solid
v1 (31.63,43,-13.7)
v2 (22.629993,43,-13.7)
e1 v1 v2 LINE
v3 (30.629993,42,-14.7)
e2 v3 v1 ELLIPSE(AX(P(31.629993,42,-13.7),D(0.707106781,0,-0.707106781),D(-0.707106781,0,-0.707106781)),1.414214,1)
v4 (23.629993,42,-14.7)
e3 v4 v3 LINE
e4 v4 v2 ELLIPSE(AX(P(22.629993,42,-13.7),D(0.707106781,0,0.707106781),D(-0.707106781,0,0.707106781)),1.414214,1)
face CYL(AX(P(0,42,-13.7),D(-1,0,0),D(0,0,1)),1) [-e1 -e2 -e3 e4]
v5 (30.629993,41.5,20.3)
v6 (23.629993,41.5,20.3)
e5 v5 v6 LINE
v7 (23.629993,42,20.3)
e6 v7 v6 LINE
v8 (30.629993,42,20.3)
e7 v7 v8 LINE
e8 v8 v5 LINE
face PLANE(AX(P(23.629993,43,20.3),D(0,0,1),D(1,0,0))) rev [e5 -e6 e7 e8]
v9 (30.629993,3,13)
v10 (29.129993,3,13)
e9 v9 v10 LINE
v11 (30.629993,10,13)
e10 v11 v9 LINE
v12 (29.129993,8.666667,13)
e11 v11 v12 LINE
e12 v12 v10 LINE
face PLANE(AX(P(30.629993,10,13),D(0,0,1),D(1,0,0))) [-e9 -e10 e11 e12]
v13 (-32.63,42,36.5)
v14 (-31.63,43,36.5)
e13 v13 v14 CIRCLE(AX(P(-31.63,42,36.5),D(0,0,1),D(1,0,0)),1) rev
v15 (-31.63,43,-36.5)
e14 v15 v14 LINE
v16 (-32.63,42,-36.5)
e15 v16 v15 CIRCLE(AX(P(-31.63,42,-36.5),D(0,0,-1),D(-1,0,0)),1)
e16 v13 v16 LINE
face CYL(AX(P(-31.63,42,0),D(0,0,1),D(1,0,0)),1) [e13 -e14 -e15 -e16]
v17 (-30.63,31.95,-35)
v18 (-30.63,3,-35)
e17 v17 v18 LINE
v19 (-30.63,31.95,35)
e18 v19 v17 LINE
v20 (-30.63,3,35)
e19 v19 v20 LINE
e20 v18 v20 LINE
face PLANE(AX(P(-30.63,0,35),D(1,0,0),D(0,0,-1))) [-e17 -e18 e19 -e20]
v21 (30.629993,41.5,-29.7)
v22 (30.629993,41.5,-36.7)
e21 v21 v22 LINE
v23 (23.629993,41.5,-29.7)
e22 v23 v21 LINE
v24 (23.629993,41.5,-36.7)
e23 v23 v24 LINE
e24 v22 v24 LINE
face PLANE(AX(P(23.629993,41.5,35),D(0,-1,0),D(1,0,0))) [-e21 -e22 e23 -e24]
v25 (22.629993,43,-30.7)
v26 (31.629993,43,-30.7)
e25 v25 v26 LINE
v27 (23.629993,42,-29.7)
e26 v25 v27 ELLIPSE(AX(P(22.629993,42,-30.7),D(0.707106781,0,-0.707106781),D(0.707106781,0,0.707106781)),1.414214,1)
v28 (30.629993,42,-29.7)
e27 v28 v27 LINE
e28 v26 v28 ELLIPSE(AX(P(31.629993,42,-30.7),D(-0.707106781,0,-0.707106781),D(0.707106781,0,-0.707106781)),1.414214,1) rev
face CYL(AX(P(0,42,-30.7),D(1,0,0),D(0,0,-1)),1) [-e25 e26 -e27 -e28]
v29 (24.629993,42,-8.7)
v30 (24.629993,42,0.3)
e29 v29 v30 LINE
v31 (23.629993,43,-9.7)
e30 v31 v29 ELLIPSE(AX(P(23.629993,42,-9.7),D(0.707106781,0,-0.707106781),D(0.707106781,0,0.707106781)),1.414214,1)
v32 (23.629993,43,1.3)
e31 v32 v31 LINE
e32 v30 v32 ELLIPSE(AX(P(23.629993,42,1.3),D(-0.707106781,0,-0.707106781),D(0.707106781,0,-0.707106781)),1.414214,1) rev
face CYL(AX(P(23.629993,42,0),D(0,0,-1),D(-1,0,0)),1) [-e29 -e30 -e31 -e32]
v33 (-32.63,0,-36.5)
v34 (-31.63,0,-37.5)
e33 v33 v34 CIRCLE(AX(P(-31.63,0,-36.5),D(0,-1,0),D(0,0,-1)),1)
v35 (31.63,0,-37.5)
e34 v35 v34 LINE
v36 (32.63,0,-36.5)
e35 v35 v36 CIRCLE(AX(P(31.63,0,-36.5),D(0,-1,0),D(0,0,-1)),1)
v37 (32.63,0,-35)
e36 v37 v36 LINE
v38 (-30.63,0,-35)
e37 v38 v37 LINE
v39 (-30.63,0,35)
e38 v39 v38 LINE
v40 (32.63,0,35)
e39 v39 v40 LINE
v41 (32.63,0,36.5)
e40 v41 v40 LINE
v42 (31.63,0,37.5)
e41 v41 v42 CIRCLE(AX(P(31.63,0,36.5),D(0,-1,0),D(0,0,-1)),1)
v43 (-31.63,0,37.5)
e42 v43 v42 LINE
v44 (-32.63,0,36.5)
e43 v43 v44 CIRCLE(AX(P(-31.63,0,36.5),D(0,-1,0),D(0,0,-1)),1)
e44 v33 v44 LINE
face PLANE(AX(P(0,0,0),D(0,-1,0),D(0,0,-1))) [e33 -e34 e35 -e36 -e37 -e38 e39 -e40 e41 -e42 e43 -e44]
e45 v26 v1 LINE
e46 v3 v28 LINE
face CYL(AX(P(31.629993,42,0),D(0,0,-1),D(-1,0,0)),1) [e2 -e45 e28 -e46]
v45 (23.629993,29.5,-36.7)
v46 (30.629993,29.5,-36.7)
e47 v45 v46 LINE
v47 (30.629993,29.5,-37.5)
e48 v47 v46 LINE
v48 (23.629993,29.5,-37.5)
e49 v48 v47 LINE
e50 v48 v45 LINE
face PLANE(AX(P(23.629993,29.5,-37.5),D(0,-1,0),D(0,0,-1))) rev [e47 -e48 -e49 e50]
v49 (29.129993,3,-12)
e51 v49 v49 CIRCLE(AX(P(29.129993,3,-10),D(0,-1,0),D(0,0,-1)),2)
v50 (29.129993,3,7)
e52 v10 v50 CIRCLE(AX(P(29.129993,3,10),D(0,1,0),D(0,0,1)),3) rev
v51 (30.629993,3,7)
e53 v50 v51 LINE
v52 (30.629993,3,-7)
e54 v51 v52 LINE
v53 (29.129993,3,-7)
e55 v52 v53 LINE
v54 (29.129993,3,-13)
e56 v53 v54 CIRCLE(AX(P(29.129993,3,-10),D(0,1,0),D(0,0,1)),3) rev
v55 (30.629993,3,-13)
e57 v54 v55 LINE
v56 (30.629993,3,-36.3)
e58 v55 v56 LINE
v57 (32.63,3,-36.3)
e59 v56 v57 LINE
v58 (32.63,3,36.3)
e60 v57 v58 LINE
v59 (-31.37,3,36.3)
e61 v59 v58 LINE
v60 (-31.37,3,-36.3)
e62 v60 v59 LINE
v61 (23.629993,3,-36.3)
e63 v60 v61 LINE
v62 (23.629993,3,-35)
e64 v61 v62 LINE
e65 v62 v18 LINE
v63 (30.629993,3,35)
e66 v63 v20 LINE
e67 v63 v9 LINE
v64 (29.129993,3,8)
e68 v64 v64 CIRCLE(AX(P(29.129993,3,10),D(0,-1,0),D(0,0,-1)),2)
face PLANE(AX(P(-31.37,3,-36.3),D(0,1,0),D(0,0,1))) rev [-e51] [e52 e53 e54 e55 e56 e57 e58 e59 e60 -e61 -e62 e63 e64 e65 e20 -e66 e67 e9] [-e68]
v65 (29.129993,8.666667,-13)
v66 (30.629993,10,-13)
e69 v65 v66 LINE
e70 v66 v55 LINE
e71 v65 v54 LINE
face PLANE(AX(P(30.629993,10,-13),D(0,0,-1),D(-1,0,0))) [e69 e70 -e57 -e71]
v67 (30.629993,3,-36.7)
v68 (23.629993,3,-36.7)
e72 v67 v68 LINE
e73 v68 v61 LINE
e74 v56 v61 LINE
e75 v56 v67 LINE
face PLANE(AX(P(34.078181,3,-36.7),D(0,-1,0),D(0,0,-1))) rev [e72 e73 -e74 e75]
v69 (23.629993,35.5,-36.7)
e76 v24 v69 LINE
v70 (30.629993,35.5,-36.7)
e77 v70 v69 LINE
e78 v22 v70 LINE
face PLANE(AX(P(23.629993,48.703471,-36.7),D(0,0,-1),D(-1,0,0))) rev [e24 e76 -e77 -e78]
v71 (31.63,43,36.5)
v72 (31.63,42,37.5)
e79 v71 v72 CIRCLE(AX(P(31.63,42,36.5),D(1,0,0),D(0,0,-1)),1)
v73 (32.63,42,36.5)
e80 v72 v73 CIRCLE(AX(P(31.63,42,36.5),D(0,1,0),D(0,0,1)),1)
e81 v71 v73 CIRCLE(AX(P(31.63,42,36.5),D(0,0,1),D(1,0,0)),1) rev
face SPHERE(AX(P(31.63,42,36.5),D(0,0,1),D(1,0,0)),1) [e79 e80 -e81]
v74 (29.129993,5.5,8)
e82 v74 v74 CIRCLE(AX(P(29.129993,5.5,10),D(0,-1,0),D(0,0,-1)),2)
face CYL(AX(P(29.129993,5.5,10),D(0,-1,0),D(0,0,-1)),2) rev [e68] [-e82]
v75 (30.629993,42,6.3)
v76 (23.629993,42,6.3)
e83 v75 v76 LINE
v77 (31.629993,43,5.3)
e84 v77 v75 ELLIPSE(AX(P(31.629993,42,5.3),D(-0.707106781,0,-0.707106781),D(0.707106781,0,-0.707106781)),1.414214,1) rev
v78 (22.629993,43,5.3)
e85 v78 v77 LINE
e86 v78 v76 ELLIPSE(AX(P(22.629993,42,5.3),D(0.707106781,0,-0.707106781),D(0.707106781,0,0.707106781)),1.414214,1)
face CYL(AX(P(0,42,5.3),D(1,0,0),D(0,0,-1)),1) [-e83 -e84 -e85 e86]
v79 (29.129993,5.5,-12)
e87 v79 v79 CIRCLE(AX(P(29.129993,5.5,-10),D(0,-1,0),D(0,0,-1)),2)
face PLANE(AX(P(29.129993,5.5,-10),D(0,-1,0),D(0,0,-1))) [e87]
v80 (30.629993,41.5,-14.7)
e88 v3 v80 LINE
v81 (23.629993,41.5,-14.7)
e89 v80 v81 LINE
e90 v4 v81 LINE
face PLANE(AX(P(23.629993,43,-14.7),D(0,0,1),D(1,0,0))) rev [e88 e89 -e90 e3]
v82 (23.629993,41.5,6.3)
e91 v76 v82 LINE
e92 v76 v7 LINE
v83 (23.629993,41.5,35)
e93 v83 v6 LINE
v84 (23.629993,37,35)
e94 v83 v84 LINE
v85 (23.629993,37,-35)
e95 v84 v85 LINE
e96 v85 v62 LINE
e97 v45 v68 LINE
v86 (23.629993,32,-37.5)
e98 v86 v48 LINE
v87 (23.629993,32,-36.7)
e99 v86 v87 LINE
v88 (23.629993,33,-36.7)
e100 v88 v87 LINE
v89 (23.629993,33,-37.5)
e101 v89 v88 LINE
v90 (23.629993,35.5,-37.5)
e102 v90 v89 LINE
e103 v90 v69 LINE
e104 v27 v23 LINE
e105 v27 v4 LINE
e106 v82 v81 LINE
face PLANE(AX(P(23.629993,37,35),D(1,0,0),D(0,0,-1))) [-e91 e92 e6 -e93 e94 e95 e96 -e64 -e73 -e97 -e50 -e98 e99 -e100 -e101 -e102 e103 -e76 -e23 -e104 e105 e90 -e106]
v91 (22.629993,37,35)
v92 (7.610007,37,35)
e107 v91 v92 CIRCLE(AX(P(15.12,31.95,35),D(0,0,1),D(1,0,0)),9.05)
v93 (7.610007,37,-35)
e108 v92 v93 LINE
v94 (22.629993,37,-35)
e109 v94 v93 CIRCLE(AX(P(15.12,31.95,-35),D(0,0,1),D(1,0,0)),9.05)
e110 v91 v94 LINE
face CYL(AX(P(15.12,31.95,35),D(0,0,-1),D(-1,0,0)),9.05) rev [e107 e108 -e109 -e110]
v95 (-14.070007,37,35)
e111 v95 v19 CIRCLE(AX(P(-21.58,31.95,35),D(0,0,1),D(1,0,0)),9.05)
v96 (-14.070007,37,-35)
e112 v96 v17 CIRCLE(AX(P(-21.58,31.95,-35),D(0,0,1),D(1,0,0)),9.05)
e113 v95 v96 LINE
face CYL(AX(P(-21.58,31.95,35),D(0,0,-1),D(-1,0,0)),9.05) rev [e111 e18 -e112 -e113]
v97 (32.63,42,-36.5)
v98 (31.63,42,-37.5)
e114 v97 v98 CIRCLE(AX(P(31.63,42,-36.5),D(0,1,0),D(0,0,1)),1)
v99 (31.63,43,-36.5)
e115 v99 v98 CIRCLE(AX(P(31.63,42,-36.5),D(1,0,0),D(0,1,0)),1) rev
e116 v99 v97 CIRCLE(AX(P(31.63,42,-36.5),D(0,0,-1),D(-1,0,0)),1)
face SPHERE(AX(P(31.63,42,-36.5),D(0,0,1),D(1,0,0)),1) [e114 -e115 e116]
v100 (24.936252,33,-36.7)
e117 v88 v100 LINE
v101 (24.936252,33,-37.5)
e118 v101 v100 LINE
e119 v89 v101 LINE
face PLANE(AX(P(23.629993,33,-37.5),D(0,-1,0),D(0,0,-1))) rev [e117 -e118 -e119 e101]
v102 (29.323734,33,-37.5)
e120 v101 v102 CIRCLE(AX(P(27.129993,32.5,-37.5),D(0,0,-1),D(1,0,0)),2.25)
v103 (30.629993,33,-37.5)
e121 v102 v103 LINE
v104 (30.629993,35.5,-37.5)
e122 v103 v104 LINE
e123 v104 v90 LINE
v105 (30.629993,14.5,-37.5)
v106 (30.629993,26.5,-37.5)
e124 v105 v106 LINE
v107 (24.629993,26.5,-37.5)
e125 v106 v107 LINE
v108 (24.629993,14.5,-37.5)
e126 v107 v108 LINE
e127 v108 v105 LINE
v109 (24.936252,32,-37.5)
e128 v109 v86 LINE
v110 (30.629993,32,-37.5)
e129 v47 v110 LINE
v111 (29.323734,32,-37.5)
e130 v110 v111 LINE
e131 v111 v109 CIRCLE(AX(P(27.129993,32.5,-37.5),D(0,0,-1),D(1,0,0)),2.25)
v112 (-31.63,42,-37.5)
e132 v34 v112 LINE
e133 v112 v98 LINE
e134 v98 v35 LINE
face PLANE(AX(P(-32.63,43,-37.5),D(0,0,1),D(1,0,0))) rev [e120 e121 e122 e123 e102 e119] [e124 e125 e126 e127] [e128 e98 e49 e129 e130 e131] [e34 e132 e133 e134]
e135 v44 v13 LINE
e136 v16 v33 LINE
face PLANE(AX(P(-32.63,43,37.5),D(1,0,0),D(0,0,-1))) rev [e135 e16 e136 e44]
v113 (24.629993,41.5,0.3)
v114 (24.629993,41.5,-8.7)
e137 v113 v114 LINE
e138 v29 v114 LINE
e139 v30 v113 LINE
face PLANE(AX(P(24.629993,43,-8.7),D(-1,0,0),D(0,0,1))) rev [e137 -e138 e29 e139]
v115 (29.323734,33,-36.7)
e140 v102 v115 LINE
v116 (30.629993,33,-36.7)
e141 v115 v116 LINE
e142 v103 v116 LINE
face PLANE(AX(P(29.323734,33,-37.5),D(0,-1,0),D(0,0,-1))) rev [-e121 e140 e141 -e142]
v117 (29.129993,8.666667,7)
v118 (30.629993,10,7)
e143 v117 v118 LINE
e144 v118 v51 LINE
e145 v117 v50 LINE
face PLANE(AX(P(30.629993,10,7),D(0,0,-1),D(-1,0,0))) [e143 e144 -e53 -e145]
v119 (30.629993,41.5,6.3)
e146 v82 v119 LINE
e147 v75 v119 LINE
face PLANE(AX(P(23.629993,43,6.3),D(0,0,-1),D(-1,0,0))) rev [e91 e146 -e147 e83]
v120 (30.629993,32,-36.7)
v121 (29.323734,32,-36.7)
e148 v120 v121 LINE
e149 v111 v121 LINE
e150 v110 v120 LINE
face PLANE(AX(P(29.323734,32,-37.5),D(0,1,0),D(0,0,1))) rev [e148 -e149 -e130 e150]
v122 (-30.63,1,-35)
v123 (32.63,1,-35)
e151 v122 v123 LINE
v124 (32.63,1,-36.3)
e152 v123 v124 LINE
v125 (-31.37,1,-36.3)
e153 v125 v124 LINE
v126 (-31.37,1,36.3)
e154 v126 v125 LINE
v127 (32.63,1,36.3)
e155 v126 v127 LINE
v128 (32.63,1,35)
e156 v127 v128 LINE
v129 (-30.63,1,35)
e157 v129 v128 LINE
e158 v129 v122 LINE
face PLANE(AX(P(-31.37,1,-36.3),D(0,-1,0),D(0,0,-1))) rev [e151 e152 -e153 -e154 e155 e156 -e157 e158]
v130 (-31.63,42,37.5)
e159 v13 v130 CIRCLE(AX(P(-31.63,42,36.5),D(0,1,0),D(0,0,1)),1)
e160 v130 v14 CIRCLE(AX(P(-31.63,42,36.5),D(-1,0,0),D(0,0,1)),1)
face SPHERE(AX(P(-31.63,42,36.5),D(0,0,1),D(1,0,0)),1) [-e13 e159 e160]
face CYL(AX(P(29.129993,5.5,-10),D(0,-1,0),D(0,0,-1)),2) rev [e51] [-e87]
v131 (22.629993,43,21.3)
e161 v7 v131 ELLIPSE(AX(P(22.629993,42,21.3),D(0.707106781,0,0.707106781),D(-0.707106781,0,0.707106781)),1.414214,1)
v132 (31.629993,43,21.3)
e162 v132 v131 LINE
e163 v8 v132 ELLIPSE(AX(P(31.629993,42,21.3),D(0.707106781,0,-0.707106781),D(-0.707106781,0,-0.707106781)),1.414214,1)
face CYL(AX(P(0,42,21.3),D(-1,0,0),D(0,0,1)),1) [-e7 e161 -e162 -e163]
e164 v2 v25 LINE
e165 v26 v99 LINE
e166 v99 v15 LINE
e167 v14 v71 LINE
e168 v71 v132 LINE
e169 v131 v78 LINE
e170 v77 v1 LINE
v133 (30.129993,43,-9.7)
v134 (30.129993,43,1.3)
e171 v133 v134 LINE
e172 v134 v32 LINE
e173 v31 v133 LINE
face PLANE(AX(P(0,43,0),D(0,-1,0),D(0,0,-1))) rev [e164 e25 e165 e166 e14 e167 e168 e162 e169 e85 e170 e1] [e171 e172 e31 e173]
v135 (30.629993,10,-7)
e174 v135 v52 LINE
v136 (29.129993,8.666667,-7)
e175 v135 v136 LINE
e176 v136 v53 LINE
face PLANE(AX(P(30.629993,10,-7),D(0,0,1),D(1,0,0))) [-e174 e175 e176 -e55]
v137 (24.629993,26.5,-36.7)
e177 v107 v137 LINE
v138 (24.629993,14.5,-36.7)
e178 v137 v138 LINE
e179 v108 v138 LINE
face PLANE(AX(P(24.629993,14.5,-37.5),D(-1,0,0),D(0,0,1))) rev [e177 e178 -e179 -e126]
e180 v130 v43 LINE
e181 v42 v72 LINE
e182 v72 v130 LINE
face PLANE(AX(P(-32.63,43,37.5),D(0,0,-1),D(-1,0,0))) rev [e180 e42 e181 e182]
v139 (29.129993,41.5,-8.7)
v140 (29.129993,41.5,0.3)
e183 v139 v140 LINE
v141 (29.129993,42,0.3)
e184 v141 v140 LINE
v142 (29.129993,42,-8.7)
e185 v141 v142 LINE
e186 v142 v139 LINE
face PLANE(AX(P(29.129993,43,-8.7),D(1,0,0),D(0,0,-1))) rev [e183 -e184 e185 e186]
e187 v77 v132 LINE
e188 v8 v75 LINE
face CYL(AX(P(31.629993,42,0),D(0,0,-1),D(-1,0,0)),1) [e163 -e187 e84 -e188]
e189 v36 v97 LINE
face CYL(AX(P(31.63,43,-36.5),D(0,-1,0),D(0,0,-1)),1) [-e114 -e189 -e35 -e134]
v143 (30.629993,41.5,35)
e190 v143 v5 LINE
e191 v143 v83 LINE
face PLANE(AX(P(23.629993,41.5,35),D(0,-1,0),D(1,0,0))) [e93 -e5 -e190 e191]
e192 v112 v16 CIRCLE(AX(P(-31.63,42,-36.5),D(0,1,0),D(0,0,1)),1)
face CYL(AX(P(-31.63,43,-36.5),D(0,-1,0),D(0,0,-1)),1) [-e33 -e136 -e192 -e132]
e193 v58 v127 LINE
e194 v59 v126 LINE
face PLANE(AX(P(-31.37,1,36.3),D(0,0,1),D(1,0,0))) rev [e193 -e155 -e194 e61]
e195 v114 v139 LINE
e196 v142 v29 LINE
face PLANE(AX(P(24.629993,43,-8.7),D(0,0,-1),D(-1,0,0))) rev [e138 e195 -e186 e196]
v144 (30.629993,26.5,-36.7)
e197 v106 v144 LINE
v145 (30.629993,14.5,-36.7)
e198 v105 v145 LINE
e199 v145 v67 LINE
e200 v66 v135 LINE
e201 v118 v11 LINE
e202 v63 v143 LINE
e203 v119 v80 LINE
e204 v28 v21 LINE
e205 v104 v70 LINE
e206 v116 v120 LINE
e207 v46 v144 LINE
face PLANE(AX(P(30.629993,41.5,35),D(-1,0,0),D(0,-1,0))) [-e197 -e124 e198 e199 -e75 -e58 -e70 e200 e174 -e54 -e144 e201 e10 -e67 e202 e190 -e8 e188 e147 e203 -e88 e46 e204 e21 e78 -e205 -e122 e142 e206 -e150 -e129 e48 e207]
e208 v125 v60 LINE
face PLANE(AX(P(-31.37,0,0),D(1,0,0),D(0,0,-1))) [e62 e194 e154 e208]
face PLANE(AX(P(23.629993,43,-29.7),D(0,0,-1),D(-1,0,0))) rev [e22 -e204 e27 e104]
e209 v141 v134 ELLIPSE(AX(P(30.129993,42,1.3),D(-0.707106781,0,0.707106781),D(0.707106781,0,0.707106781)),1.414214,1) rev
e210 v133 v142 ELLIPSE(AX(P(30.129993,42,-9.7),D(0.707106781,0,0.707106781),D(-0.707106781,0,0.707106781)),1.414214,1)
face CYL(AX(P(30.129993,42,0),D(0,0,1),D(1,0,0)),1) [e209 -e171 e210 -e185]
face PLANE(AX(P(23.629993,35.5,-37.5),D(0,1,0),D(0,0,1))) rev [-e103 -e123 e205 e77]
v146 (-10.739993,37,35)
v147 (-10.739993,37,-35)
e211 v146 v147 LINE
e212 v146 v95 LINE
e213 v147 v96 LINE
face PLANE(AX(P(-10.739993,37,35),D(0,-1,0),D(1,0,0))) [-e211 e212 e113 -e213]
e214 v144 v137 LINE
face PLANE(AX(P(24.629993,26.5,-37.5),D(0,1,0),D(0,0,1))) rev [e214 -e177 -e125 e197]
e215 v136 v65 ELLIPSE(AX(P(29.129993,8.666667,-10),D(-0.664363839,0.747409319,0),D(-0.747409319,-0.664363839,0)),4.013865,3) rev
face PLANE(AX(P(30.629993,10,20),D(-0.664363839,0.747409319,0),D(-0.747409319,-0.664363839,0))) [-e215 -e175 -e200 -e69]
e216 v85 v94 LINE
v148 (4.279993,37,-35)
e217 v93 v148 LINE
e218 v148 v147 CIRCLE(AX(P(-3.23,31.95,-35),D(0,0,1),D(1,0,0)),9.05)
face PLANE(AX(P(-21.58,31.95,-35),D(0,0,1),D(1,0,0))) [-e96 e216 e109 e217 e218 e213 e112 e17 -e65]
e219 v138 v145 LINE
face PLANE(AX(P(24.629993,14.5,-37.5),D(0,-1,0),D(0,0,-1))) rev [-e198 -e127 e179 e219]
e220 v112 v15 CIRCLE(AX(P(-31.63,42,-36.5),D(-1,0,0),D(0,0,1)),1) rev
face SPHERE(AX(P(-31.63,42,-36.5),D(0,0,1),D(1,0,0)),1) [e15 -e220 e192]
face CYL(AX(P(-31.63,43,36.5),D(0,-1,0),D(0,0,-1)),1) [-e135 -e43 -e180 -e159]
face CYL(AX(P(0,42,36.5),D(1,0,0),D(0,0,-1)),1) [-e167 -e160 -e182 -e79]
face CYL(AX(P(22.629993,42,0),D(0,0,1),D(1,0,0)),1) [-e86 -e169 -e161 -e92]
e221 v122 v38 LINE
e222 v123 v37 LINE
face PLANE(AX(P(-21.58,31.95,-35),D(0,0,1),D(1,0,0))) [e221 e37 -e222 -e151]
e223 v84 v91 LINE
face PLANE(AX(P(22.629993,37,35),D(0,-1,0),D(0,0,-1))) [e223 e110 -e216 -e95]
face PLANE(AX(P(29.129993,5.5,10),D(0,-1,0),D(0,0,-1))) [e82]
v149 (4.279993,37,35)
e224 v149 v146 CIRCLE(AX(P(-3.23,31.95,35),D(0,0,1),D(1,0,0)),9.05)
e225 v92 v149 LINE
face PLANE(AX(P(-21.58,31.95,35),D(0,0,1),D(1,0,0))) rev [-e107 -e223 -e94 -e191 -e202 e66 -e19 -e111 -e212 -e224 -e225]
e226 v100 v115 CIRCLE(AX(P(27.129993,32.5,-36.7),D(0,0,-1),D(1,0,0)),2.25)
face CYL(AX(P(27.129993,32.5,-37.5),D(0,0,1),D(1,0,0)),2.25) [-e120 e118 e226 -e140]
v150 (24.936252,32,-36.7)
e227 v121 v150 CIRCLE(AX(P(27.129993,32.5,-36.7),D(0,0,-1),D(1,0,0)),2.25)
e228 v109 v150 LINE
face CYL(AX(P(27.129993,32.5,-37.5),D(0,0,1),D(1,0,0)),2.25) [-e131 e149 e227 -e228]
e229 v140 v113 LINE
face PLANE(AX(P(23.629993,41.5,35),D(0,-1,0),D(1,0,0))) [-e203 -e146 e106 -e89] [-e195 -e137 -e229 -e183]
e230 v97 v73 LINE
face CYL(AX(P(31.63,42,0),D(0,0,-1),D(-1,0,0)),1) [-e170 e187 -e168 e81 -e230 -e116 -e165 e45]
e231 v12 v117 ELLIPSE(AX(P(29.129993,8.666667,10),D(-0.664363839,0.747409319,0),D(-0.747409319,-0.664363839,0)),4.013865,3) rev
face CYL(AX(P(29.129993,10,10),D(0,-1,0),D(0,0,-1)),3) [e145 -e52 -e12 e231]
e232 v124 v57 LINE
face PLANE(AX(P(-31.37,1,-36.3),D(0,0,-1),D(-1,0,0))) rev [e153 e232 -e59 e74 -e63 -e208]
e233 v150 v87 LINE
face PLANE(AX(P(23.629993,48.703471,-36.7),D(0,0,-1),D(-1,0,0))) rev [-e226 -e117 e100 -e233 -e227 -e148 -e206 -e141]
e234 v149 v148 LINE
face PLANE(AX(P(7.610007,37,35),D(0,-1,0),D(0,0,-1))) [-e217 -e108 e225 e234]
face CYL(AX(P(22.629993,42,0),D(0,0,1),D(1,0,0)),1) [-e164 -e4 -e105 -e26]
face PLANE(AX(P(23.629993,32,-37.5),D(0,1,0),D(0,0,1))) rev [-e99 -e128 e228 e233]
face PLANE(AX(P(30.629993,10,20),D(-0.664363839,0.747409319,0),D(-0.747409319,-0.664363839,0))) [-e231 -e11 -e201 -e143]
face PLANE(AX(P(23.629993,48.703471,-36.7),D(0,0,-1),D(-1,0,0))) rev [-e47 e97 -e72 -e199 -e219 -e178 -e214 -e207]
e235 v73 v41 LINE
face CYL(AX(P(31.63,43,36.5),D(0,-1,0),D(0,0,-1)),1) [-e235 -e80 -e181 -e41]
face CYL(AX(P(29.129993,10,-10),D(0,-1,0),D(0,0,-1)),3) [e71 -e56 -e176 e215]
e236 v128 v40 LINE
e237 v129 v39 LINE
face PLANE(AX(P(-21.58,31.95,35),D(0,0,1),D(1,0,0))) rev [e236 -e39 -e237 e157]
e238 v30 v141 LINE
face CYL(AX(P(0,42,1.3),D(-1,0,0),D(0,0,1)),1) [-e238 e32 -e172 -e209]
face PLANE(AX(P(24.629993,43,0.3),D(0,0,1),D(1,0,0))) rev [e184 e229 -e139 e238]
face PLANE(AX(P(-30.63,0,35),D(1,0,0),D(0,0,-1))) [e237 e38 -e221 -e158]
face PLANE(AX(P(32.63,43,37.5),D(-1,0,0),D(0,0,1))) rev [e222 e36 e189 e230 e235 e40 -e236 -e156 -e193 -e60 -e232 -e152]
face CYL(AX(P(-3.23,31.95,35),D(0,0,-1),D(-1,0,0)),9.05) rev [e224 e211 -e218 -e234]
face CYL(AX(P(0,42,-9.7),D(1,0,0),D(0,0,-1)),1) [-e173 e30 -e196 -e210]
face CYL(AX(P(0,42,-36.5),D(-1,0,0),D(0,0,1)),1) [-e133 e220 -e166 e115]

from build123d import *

# Parameters (mm, degrees)
SKETCH1_W               = 65.26
SKETCH1_H               = 75
BOSS_EXTRUDE1_DEPTH     = 43
CUT_EXTRUDE1_DEPTH      = 35
CUT_EXTRUDE1_DEPTH_BACK = 35
SKETCH4_W               = 7
SKETCH4_H               = 1.7
CUT_EXTRUDE2_DEPTH      = 41.5
SKETCH5_W               = 7
SKETCH5_H               = 14
SKETCH5_H_2             = 15
SKETCH5_W_2             = 4.5
SKETCH5_H_3             = 9
CUT_EXTRUDE3_DEPTH      = 65.755053085
SKETCH7_W               = 6
SKETCH7_H               = 12
CUT_EXTRUDE4_DEPTH      = 92.75705368
FILLET1_R               = 1
BOSS_EXTRUDE2_DEPTH     = 10
CUT_EXTRUDE5_DEPTH      = 20
CUT_EXTRUDE5_DEPTH_BACK = 20
SKETCH12_W              = 72.6
SKETCH12_H              = 2
CUT_EXTRUDE6_DEPTH      = 64
SKETCH13_W              = 6.500006658
SKETCH13_H              = 70
CUT_EXTRUDE7_DEPTH      = 3
BOSS_EXTRUDE3_DEPTH     = 7
SKETCH17_R              = 2
CUT_EXTRUDE9_DEPTH      = 2.5


with BuildPart() as part:
    # Sketch1 → Boss-Extrude1 (new body)
    with BuildSketch(Plane(origin=(0, 0, 0), x_dir=(1, 0, 0), z_dir=(0, 1, 0))):
        Rectangle(SKETCH1_W, SKETCH1_H)
    extrude(amount=BOSS_EXTRUDE1_DEPTH)

    # Sketch3 → Cut-Extrude1 (cut, two sides: drawn at the far end of the back side and taken through both)
    with BuildSketch(Plane.XY.offset(-CUT_EXTRUDE1_DEPTH_BACK)):
        with BuildLine():
            Line((30.629993342, 0), (-30.63, 0))
            Line((-30.63, 0), (-30.63, 31.95))
            ThreePointArc((-30.63, 31.95), (-24.219797365, 40.606440947), (-14.070006658, 37))
            Line((-14.070006658, 37), (-10.739993342, 37))
            ThreePointArc((-10.739993342, 37), (-3.23, 41), (4.279993342, 37))
            Line((4.279993342, 37), (7.610006658, 37))
            ThreePointArc((7.610006658, 37), (15.12, 41), (22.629993342, 37))
            Line((22.629993342, 37), (23.629993342, 37))
            Line((23.629993342, 37), (23.629993342, 41.5))
            Line((23.629993342, 41.5), (30.629993342, 41.5))
            Line((30.629993342, 41.5), (30.629993342, 0))
        make_face()
    extrude(amount=CUT_EXTRUDE1_DEPTH + CUT_EXTRUDE1_DEPTH_BACK, mode=Mode.SUBTRACT)

    # Sketch4 → Cut-Extrude2 (cut)
    with BuildSketch(Plane(origin=(0, 0, 0), x_dir=(-1, 0, 0), z_dir=(0, -1, 0))):
        with Locations((-27.129993342, 35.85)):
            Rectangle(SKETCH4_W, SKETCH4_H)
    extrude(amount=-CUT_EXTRUDE2_DEPTH, mode=Mode.SUBTRACT)

    # Sketch5 → Cut-Extrude3 (cut, through all)
    with BuildSketch(Plane(origin=(0, 41.5, 0), x_dir=(-1, 0, 0), z_dir=(0, -1, 0))):
        with Locations((-27.129993342, -13.3)):
            Rectangle(SKETCH5_W, SKETCH5_H)
        with Locations((-27.129993342, 22.2)):
            Rectangle(SKETCH5_W, SKETCH5_H_2)
        with Locations((-26.879993342, 4.2)):
            Rectangle(SKETCH5_W_2, SKETCH5_H_3)
    extrude(amount=-CUT_EXTRUDE3_DEPTH, mode=Mode.SUBTRACT)

    # Sketch7 → Cut-Extrude4 (cut, through all)
    with BuildSketch(Plane.XY.offset(-36.7)):
        with BuildLine():
            Line((23.629993342, 29.5), (30.629993342, 29.5))
            Line((30.629993342, 29.5), (30.629993342, 32))
            Line((30.629993342, 32), (29.323734439, 32))
            ThreePointArc((29.323734439, 32), (27.129993342, 30.25), (24.936252245, 32))
            Line((24.936252245, 32), (23.629993342, 32))
            Line((23.629993342, 32), (23.629993342, 29.5))
        make_face()
        with BuildLine():
            Line((23.629993342, 35.5), (30.629993342, 35.5))
            Line((30.629993342, 35.5), (30.629993342, 33))
            Line((30.629993342, 33), (29.323734439, 33))
            ThreePointArc((29.323734439, 33), (27.129993342, 34.75), (24.936252245, 33))
            Line((24.936252245, 33), (23.629993342, 33))
            Line((23.629993342, 33), (23.629993342, 35.5))
        make_face()
        with Locations((27.629993342, 20.5)):
            Rectangle(SKETCH7_W, SKETCH7_H)
    extrude(amount=-CUT_EXTRUDE4_DEPTH, mode=Mode.SUBTRACT)

    # Fillet1
    fillet1_edges = [part.edges().sort_by_distance(p)[0] for p in [
        (0, 43, -37.5),
        (32.63, 43, 0),
        (0, 43, 37.5),
        (-32.63, 43, 0),
        (29.129993342, 43, -4.2),
        (26.879993342, 43, -8.7),
        (24.629993342, 43, -4.2),
        (26.879993342, 43, 0.3),
        (30.629993342, 43, -22.2),
        (27.129993342, 43, -29.7),
        (23.629993342, 43, -22.2),
        (27.129993342, 43, -14.7),
        (30.629993342, 43, 13.3),
        (27.129993342, 43, 6.3),
        (23.629993342, 43, 13.3),
        (27.129993342, 43, 20.3),
        (32.63, 21.5, 37.5),
        (32.63, 21.5, -37.5),
        (-32.63, 21.5, 37.5),
        (-32.63, 21.5, -37.5),
    ]]
    fillet(fillet1_edges, radius=FILLET1_R - 0.0001)  # a hair under: the kernel refuses the full size

    # Sketch8 → Boss-Extrude2 (add)
    with BuildSketch(Plane(origin=(0, 0, 0), x_dir=(-1, 0, 0), z_dir=(0, -1, 0))):
        with BuildLine():
            Line((-30.629993342, 7), (-29.129993342, 7))
            ThreePointArc((-29.129993342, 7), (-26.129993342, 10), (-29.129993342, 13))
            Line((-29.129993342, 13), (-30.629993342, 13))
            Line((-30.629993342, 13), (-30.629993342, 7))
        make_face()
        with BuildLine():
            Line((-30.629993342, -13), (-29.129993342, -13))
            ThreePointArc((-29.129993342, -13), (-26.129993342, -10), (-29.129993342, -7))
            Line((-29.129993342, -7), (-30.629993342, -7))
            Line((-30.629993342, -7), (-30.629993342, -13))
        make_face()
    extrude(amount=-BOSS_EXTRUDE2_DEPTH)

    # Sketch11 → Cut-Extrude5 (cut, two sides: drawn at the far end of the back side and taken through both)
    with BuildSketch(Plane.XY.offset(-CUT_EXTRUDE5_DEPTH_BACK)):
        Polygon((30.629993342, 10), (26.129993342, 6), (26.129993342, 10), align=None)
    extrude(amount=CUT_EXTRUDE5_DEPTH + CUT_EXTRUDE5_DEPTH_BACK, mode=Mode.SUBTRACT)

    # Sketch12 → Cut-Extrude6 (cut)
    with BuildSketch(Plane(origin=(32.63, 0, 0), x_dir=(0, 0, -1), z_dir=(1, 0, 0))):
        with Locations((0, 2)):
            Rectangle(SKETCH12_W, SKETCH12_H)
    extrude(amount=-CUT_EXTRUDE6_DEPTH, mode=Mode.SUBTRACT)

    # Sketch13 → Cut-Extrude7 (cut)
    with BuildSketch(Plane.XZ):
        with Locations((29.379996671, 0)):
            Rectangle(SKETCH13_W, SKETCH13_H)
    extrude(amount=-CUT_EXTRUDE7_DEPTH, mode=Mode.SUBTRACT)

    # Sketch15 → Boss-Extrude3 (add)
    with BuildSketch(Plane(origin=(23.629993342, 0, 0), x_dir=(0, 0, -1), z_dir=(1, 0, 0))):
        Polygon((36.7, 0), (36.7, 3), (36.3, 3), (36.3, 1), (35, 1), (35, 0), align=None)
    extrude(amount=BOSS_EXTRUDE3_DEPTH)

    # Sketch17 → Cut-Extrude9 (cut)
    with BuildSketch(Plane(origin=(0, 3, 0), x_dir=(-1, 0, 0), z_dir=(0, -1, 0))):
        with Locations(Location((-29.129993342, 10, 0), (0, 0, 90))):
            Circle(SKETCH17_R)
        with Locations(Location((-29.129993342, -10, 0), (0, 0, 90))):
            Circle(SKETCH17_R)
    extrude(amount=-CUT_EXTRUDE9_DEPTH, mode=Mode.SUBTRACT)


solid = part.part
